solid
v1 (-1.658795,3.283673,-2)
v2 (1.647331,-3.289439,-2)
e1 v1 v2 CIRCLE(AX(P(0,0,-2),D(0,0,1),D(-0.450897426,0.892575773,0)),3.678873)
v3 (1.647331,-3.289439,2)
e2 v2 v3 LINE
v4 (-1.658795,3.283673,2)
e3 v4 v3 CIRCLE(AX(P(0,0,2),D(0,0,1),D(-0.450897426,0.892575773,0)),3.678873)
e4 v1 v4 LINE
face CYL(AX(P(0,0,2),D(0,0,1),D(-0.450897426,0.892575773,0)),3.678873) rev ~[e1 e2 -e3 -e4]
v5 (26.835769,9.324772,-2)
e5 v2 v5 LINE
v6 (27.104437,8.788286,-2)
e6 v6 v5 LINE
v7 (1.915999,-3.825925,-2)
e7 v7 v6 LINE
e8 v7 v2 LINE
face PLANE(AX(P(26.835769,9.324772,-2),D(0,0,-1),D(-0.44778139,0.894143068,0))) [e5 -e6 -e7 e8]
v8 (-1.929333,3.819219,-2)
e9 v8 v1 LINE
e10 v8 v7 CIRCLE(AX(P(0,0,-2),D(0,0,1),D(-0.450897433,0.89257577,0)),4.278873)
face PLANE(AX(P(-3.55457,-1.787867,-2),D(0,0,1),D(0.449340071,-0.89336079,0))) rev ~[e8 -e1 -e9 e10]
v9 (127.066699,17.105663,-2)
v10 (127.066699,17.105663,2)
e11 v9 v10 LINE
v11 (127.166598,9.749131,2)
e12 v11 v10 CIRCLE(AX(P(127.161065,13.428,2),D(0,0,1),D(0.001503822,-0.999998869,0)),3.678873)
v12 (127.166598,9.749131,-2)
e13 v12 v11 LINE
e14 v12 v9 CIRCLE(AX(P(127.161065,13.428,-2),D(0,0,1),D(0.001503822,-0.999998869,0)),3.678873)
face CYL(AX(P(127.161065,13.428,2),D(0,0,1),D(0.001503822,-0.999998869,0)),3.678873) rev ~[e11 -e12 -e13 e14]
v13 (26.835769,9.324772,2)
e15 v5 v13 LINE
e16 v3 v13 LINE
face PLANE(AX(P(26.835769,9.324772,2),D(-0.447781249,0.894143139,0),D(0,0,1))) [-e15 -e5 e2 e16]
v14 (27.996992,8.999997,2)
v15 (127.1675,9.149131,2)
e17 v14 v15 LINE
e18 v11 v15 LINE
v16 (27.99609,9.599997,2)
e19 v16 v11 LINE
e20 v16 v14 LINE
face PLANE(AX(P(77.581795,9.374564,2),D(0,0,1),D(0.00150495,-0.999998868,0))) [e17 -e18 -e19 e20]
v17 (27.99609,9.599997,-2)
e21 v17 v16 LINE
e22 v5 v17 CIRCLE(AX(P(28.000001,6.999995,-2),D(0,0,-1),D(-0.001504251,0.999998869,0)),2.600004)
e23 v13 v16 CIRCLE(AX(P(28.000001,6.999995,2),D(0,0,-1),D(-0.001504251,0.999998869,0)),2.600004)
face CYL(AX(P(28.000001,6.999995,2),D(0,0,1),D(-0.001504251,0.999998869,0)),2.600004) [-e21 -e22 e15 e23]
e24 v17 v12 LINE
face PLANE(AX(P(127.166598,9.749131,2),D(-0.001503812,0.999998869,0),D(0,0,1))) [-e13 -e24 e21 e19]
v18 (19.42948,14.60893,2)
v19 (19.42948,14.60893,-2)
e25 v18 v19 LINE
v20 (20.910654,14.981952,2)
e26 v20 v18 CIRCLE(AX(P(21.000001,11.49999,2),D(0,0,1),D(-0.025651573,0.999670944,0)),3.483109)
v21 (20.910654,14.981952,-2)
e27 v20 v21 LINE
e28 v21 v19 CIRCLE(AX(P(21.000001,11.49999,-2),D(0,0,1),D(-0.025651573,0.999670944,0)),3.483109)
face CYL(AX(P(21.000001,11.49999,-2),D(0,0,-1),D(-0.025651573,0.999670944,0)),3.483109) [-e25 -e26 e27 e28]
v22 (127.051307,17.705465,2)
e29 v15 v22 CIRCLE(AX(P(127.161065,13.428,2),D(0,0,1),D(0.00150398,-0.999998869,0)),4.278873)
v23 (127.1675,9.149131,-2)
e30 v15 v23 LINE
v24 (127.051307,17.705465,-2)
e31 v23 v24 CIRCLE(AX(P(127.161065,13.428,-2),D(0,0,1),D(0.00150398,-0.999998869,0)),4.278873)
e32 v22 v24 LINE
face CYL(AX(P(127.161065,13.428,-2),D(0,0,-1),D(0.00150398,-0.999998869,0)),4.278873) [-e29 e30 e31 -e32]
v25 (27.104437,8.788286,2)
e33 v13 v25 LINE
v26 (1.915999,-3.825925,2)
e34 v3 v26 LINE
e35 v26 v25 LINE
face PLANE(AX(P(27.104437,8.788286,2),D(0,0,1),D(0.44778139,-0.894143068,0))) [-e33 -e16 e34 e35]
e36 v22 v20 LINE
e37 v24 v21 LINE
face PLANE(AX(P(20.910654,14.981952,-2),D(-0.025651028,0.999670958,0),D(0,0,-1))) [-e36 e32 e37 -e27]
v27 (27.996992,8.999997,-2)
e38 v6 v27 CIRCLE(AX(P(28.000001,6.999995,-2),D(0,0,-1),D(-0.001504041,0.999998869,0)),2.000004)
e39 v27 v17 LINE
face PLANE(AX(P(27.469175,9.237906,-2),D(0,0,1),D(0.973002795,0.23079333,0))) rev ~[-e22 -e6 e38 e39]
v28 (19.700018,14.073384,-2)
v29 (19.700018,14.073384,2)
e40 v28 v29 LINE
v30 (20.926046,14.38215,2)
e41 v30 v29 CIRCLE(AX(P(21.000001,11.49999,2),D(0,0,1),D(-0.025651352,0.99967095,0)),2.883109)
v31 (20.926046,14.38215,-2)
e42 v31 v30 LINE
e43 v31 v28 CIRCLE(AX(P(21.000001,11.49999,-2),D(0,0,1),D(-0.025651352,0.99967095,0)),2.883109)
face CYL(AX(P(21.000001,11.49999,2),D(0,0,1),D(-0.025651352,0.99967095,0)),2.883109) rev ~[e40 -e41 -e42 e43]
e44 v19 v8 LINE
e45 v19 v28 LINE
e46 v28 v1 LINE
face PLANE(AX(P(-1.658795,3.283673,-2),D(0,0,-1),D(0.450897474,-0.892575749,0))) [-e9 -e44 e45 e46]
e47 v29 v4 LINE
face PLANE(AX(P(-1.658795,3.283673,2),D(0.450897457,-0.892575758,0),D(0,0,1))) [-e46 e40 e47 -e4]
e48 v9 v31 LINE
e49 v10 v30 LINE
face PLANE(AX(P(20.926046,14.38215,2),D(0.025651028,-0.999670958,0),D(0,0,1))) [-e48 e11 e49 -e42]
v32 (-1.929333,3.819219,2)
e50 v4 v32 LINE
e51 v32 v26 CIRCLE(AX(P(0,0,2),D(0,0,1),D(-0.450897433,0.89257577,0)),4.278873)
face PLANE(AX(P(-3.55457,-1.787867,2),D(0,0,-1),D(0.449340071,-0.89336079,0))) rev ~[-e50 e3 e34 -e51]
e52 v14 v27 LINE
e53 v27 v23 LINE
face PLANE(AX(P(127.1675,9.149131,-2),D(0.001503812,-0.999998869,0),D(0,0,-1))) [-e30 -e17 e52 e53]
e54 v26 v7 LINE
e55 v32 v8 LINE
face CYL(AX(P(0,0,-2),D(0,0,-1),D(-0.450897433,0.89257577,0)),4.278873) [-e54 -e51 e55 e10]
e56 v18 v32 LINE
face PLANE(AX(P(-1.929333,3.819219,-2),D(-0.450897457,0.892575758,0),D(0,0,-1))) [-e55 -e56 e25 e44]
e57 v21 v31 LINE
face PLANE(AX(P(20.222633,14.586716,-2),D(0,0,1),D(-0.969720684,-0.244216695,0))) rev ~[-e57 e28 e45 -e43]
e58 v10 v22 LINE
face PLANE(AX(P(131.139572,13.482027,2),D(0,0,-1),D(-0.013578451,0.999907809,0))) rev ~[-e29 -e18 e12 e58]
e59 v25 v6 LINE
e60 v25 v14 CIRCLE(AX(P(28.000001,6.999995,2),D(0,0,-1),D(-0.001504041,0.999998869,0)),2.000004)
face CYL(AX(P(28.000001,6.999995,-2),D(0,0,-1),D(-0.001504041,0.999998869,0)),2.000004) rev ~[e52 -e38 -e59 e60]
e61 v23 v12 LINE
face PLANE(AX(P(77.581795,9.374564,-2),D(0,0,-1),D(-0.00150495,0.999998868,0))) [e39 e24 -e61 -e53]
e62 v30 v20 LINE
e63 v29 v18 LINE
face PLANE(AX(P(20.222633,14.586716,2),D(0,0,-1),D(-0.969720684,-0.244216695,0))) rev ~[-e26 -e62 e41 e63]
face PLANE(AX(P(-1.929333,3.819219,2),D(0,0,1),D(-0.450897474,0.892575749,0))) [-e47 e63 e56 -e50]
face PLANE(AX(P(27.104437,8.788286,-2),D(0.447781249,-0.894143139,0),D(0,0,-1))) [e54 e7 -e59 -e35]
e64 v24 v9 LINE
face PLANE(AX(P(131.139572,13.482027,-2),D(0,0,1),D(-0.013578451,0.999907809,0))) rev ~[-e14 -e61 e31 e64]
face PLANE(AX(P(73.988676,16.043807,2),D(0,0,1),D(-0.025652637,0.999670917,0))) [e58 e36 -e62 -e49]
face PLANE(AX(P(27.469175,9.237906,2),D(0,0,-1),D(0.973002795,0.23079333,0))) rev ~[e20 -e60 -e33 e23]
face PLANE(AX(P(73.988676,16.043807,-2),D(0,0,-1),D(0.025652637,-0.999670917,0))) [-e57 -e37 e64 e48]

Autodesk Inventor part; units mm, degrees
sketch "Skizzenpfad" plane through (0, 0, 0) normal (0, 0, 1) x (1, 0, 0)
  arc A0 (20.91835, 14.682051) -> (19.564749, 14.341157) centre (21, 11.5) ccw
  arc A1 (127.167049, 9.449131) -> (127.059003, 17.405564) centre (127.161065, 13.428) ccw
  arc A2 (27.996541, 9.299997) -> (26.970103, 9.056529) centre (28, 7) ccw
  arc A3 (-1.794064, 3.551446) -> (1.781665, -3.557682) centre (0, 0) ccw
  line L0 (-1.794064, 3.551446) -> (19.564749, 14.341157)
  line L1 (20.91835, 14.682051) -> (127.059003, 17.405564)
  line L2 (127.167049, 9.449131) -> (27.996541, 9.299997)
  line L3 (26.970103, 9.056529) -> (1.781665, -3.557682)
ref_plane "Querschnittsebene" through (19.564749, 14.341157, 0) normal (-0.8925758, -0.4508975, 0) x (0, 0, 1)
ref_plane "Arbeitsebene2" through (21, 11.5, 0) normal (-1, 0, 0) x (0, 0, 1)
ref_plane "Arbeitsebene3" through (127.161065, 13.428, 0) normal (-0.9467755, 0.3218947, 0) x (0, 0, 1)
ref_plane "Arbeitsebene4" through (0, 0, 0) normal (0.9748553, 0.2228388, 0) x (0, 0, 1)
sketch "Querschnitt" plane through (19.564749, 14.341157, 0) normal (-0.8925758, -0.4508975, 0) x (0, 0, 1)
  line L0 (-2, 0.3) -> (2, 0.3)
  line L1 (2, 0.3) -> (2, -0.3)
  line L2 (2, -0.3) -> (-2, -0.3)
  line L3 (-2, -0.3) -> (-2, 0.3)
  line L4 (-2, 0) -> (2, 0) construction
  point P0 (0, 0)
  point P1 (0, 0)
  dimension "d0" = 4
  dimension "d4" = 0.3
  dimension "d5" = 0.3
sweep "Riemen" add profiles "Querschnitt" path "Skizzenpfad"
equation "\"d0\" = da_B"
equation "\"d4\" = da_a"
equation "\"d5\" = da_a2"
equation "\"da_B\" = 4"
equation "\"da_pb\" = 2.5"
equation "\"da_L\" = 285"
equation "\"da_a\" = 0.3"
equation "\"da_S\" = 1.5"
equation "\"da_Beta\" = 20deg"
equation "\"da_Ht\" = 0.7"
equation "\"da_H\" = 1.3"
equation "\"da_a2\" = 0.3"
properties part number "Zahnriemen" material "Rubber"
